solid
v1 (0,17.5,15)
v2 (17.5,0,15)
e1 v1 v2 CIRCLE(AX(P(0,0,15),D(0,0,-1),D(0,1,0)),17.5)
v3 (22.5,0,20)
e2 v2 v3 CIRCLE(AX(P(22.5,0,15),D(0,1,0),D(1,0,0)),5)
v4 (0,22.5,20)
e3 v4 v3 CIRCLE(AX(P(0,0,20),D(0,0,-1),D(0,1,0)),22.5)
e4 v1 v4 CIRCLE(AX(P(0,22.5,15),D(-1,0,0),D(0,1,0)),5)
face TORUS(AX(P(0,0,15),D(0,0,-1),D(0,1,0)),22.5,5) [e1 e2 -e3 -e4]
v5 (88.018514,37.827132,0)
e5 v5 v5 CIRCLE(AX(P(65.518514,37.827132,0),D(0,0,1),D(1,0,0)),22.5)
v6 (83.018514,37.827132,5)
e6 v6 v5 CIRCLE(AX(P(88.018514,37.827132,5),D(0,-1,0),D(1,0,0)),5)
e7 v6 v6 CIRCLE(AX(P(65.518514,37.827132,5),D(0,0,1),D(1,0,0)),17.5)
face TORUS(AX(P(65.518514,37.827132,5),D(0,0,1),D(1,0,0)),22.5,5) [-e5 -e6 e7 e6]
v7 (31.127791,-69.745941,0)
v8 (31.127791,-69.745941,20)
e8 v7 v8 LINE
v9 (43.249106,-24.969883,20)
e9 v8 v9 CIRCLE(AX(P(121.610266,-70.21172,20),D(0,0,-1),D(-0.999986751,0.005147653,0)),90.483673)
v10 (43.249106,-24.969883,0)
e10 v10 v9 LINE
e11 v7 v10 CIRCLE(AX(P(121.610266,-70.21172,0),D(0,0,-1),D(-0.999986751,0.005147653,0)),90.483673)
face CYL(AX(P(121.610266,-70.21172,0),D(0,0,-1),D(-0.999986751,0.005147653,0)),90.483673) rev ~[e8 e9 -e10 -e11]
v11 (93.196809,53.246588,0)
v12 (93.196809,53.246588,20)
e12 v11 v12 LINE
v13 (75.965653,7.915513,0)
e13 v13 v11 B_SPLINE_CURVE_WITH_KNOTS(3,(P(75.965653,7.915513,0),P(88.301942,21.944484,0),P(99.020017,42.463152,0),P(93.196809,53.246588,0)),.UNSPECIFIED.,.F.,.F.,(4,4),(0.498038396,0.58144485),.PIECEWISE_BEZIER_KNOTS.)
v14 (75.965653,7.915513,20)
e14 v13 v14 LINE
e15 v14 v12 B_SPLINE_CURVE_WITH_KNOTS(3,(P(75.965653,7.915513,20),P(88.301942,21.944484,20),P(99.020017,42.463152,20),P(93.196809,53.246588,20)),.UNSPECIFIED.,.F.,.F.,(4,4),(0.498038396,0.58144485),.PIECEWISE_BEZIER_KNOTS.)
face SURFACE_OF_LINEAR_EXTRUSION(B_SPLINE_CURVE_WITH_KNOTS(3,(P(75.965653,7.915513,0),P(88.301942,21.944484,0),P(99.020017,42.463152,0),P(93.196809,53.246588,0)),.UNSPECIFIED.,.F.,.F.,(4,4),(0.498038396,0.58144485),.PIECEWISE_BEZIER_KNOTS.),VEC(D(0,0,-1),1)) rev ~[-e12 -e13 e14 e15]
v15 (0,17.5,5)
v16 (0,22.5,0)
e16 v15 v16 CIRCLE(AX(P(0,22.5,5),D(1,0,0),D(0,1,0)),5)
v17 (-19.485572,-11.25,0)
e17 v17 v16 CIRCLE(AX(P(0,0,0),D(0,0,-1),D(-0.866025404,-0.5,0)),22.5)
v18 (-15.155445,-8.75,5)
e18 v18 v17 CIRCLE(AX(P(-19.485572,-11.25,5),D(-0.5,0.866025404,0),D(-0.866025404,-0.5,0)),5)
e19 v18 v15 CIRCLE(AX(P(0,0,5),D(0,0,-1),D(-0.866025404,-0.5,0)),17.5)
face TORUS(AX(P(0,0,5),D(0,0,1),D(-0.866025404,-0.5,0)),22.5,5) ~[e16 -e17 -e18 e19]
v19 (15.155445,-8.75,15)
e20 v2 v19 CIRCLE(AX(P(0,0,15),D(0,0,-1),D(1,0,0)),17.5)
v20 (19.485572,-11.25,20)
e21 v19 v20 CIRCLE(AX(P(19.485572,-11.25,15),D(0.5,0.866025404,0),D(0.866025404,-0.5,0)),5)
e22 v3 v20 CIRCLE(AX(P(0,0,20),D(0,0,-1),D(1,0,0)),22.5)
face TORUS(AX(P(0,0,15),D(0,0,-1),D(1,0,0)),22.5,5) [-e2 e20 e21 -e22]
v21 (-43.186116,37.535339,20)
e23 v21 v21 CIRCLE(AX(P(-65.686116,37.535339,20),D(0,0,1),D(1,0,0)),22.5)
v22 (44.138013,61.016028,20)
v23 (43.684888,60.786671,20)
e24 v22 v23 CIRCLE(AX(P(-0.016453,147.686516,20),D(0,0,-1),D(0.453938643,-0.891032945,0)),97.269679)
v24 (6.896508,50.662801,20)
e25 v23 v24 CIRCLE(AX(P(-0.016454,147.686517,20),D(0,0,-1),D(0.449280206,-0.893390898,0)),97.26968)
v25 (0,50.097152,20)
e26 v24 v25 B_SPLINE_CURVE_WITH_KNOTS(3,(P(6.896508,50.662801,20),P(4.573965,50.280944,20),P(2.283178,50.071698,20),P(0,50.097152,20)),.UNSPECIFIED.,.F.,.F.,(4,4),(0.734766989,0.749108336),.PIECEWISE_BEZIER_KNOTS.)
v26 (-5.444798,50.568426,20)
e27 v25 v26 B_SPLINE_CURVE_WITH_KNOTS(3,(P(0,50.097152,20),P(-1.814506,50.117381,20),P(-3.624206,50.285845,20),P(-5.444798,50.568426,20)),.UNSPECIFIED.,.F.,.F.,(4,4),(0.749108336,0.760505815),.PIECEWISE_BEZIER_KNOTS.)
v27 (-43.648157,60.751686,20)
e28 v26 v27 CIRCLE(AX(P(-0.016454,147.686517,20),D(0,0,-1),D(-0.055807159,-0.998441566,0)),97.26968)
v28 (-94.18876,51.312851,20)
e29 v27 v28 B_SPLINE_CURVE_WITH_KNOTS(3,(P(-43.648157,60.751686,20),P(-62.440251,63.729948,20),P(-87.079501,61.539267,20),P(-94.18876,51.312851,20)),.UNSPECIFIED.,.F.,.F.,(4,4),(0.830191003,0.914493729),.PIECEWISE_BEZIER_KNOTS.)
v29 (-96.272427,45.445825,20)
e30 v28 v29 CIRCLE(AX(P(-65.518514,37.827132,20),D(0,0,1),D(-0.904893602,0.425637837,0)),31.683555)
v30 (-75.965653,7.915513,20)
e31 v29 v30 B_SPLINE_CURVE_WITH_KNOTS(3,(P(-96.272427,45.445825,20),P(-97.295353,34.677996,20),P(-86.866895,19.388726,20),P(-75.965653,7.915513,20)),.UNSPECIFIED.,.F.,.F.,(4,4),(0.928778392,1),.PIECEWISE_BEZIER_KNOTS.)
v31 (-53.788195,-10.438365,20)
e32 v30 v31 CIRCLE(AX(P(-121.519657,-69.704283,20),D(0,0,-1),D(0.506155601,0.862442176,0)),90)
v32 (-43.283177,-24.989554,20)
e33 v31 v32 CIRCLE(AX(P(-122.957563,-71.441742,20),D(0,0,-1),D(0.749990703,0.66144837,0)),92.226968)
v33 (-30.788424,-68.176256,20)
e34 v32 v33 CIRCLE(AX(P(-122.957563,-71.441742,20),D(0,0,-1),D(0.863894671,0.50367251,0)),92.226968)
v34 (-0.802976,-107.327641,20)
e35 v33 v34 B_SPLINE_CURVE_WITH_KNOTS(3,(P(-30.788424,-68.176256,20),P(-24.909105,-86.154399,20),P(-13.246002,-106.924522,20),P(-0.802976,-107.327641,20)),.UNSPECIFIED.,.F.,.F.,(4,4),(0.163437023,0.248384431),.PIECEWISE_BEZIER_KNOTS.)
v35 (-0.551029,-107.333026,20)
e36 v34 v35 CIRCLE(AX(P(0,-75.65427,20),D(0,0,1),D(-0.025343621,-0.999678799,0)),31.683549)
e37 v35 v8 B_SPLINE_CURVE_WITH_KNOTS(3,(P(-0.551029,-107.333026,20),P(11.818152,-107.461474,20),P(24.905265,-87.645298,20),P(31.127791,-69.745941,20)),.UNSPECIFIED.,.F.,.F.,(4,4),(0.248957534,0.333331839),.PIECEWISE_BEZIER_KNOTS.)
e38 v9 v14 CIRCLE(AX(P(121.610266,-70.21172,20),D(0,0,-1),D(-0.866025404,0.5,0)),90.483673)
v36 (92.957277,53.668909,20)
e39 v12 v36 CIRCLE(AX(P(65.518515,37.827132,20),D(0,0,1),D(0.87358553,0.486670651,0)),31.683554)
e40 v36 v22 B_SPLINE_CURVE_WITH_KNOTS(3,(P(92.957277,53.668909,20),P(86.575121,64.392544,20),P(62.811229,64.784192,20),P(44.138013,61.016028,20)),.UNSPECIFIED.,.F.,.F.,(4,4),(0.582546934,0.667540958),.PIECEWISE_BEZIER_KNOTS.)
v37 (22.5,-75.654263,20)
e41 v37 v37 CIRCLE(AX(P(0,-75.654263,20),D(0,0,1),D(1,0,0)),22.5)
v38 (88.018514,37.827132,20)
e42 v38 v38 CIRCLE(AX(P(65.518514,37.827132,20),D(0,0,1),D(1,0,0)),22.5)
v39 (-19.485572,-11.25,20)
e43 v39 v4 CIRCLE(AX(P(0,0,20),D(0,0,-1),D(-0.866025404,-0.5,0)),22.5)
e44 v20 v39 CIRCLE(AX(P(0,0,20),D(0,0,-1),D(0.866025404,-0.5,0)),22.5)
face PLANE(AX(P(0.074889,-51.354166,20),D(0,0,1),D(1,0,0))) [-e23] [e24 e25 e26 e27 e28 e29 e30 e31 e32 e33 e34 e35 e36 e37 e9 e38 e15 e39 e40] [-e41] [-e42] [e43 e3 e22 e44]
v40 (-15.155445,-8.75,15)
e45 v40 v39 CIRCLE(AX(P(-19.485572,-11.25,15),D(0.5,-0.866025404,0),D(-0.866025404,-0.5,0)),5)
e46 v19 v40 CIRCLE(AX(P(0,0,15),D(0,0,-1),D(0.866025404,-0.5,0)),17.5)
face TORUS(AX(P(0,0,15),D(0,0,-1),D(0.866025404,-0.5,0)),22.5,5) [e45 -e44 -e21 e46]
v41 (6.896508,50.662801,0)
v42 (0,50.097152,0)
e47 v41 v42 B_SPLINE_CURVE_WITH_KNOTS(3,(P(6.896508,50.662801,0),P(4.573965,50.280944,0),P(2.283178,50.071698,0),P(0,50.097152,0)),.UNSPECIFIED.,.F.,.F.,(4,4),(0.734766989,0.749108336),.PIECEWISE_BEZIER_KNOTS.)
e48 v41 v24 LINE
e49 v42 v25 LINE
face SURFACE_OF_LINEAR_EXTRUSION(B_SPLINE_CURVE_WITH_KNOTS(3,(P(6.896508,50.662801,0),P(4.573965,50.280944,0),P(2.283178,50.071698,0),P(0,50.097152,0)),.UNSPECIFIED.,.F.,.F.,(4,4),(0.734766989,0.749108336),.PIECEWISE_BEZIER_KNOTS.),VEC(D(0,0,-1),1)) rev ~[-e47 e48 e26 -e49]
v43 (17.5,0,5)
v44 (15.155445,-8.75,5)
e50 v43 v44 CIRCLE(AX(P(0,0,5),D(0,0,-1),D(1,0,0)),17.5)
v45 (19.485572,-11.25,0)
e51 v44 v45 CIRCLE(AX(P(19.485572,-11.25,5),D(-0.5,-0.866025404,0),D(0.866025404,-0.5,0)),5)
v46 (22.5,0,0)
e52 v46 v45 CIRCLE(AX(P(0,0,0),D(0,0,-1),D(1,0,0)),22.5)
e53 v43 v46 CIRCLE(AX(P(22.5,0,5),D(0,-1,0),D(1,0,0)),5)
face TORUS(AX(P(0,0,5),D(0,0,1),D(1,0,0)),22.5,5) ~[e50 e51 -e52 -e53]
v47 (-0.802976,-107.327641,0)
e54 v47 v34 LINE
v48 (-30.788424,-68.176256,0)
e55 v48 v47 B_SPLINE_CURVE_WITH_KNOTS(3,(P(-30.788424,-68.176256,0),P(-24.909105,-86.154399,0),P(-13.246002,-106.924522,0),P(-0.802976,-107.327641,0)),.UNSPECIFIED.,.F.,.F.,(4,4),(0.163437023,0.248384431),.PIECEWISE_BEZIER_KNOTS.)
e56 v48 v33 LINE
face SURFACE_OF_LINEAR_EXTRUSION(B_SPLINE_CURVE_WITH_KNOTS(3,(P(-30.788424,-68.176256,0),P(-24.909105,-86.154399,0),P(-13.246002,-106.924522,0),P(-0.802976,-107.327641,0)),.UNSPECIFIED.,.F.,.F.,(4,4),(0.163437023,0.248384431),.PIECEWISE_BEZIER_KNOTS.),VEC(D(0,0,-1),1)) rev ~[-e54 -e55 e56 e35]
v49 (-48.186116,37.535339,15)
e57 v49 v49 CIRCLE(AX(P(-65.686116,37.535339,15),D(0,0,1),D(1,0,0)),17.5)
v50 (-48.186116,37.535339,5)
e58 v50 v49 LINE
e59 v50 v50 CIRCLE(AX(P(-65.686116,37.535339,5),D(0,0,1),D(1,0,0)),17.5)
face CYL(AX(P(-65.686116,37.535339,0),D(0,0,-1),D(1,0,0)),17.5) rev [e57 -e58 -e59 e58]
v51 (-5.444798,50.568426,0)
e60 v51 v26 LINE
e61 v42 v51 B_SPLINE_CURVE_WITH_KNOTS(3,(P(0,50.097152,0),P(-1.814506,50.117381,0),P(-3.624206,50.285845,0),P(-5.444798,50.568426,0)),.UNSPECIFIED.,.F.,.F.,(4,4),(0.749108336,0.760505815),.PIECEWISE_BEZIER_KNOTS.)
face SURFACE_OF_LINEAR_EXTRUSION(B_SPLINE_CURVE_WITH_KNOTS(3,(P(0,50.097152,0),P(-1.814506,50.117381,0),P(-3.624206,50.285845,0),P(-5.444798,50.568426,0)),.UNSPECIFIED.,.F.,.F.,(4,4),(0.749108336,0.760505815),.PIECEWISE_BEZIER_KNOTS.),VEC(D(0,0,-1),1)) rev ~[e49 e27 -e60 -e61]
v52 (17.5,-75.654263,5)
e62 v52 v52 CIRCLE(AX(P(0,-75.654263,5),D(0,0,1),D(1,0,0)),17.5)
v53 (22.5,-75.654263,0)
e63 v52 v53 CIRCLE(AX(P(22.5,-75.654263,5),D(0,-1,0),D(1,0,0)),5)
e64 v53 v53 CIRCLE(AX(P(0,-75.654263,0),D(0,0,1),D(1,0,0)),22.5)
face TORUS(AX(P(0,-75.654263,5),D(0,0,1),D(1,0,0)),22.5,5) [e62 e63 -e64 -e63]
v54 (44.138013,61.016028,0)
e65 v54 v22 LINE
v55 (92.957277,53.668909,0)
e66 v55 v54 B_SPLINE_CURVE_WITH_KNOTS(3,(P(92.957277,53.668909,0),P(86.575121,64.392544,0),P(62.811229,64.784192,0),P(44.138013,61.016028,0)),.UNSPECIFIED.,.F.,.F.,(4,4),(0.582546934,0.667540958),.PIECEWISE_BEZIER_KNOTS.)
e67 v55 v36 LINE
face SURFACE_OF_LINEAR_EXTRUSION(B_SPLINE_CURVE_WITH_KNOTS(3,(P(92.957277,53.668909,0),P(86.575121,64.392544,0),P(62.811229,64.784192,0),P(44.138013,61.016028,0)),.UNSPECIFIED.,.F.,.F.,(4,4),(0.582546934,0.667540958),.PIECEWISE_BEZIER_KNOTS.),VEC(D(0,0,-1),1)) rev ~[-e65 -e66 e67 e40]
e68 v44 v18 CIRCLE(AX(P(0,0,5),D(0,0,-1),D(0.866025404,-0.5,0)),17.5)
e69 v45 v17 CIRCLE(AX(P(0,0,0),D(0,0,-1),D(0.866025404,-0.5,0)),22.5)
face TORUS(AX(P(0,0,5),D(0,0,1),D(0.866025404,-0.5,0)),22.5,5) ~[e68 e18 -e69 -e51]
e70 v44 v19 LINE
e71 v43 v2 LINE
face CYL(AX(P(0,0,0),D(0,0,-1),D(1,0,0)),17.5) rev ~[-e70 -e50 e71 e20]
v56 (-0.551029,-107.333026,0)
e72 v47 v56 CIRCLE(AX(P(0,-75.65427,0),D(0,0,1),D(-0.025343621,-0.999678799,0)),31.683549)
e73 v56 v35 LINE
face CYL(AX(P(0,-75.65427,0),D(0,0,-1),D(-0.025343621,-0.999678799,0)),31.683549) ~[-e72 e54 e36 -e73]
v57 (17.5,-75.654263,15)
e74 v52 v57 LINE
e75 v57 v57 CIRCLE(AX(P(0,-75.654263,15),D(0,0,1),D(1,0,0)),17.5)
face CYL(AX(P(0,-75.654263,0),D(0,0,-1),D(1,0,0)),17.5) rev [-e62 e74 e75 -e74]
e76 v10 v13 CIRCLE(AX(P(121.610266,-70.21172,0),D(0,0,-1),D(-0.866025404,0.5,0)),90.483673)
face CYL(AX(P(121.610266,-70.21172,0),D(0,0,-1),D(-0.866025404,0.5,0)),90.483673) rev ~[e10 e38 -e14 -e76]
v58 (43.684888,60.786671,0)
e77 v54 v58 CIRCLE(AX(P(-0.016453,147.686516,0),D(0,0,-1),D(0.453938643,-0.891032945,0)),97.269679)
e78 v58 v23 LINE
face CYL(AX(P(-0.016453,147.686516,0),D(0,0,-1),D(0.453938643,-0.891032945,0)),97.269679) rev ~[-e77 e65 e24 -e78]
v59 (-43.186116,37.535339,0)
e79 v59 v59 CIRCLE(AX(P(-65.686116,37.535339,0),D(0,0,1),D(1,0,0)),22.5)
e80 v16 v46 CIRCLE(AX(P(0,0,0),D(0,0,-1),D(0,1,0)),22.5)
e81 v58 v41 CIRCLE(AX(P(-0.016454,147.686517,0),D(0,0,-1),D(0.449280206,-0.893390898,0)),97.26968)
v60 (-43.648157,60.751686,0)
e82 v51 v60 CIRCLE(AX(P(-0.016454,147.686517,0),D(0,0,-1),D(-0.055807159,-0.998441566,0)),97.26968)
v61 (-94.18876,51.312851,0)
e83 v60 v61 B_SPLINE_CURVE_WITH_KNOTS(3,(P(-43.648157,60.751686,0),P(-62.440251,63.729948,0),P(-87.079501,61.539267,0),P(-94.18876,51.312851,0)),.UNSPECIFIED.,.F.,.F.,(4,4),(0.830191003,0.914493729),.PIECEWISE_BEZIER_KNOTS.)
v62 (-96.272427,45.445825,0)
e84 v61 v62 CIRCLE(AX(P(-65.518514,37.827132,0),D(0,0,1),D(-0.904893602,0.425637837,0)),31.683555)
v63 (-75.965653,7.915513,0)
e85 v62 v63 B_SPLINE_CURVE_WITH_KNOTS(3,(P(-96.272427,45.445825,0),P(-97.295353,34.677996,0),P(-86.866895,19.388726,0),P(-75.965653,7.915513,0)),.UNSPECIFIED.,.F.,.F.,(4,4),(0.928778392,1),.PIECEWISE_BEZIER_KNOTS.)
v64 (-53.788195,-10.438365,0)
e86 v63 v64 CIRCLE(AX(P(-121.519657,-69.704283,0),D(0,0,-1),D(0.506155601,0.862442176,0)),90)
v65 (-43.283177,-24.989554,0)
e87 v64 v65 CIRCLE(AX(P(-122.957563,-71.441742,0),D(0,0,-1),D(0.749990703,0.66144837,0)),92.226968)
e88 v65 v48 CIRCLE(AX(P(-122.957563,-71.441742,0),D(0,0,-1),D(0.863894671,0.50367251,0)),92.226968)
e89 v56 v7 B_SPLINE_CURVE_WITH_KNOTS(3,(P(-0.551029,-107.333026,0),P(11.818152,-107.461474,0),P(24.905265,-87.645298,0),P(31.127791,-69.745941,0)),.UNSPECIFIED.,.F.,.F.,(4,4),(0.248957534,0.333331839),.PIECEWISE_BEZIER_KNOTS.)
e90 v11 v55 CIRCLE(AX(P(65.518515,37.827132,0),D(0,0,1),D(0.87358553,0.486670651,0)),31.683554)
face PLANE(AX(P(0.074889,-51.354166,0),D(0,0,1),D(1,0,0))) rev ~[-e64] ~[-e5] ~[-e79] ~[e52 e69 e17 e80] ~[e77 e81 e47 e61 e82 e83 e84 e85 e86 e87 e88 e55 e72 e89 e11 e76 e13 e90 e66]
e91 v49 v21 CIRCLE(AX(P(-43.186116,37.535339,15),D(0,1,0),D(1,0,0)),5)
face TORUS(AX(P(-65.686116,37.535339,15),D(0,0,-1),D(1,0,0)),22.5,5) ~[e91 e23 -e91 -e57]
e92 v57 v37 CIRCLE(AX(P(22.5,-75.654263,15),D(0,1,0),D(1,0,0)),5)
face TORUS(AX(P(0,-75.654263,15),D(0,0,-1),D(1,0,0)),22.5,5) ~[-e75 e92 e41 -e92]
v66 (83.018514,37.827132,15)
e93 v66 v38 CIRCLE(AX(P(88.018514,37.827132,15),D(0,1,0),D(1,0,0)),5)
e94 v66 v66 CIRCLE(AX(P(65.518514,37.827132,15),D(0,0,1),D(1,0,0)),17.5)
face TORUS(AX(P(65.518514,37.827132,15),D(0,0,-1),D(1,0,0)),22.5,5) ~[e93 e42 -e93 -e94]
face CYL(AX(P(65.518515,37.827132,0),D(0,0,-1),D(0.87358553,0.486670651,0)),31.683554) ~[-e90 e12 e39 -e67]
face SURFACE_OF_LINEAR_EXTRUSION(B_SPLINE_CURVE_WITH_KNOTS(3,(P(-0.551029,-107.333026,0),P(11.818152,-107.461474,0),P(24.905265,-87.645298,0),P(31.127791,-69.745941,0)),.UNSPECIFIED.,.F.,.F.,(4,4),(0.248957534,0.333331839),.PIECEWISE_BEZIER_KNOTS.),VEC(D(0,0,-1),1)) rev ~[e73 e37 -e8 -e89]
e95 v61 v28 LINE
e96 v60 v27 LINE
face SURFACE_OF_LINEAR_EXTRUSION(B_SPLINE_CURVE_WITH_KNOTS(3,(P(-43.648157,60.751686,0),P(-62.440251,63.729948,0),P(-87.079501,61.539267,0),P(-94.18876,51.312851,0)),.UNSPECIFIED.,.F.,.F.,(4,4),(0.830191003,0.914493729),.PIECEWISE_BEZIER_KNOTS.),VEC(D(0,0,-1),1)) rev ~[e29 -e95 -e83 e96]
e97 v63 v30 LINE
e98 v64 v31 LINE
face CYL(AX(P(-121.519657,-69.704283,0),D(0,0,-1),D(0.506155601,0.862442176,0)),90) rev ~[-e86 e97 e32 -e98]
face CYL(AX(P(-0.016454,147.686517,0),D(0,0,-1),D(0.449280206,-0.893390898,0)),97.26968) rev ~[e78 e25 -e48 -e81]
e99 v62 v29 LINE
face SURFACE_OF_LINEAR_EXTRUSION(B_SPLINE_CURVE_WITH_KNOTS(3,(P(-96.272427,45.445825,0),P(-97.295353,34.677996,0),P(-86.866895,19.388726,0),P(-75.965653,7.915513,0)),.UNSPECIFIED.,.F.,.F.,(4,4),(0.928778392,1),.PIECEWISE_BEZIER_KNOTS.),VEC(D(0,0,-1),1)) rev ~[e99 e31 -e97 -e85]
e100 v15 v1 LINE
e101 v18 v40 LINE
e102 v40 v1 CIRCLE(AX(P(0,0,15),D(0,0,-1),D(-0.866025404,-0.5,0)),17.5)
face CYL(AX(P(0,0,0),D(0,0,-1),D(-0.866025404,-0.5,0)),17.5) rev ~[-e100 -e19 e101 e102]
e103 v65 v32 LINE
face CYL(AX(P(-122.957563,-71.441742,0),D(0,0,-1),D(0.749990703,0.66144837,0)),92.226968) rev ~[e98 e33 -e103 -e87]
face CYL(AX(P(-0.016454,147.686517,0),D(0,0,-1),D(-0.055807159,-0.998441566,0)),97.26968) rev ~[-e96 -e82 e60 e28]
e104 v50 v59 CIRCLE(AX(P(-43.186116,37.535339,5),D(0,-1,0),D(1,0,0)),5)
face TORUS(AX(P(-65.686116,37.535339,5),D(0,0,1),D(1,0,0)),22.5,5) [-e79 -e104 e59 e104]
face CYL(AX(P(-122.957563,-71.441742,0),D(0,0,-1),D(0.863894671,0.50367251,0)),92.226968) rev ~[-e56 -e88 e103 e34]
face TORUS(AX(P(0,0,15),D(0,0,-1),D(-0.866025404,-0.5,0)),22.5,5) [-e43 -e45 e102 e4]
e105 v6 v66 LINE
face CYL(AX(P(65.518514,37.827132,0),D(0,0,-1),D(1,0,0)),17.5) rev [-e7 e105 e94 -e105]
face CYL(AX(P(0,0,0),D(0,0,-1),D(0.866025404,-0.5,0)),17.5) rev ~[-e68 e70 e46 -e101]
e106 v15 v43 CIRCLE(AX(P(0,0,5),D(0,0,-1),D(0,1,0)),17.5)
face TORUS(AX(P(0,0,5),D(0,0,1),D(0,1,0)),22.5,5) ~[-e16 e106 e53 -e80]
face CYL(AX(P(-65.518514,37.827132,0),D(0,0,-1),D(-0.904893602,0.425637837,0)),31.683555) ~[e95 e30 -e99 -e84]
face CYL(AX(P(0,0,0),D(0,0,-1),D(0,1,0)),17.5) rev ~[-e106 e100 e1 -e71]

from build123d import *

# Parameters (mm, degrees)
F0_R     = 17.5
F1_DEPTH = 20
F2_R     = 5


# Not quite as in the source:
# - a feature names something its author has since deleted; it is built from what else it names


with BuildPart() as f1:
    # F0 (on Top) → F1 (new body)
    with BuildSketch(Plane.XY):
        with BuildLine():
            ThreePointArc((-0.8029759794, -107.3276413225), (-0.6770077139, -107.3305842091), (-0.551028741, -107.3330261089))
            add(Edge.make_bspline(
                [(-0.551028741, -107.3330261089), (11.8181523091, -107.461473966), (24.9052651001, -87.6452975434), (31.1277913127, -69.7459411731)],
                knots=[0.2489575342, 0.2489575342, 0.2489575342, 0.2489575342, 0.333331839, 0.333331839, 0.333331839, 0.333331839], degree=3))
            ThreePointArc((31.1277913127, -69.7459411731), (34.2703147589, -46.5679448448), (43.2491060822, -24.9698830388))
            Line((43.2491060822, -24.9698830388), (15.1554445662, -8.75))
            ThreePointArc((15.1554445662, -8.75), (0, -17.5), (-15.1554445662, -8.75))
            Line((-15.1554445662, -8.75), (-43.2831772417, -24.9895540319))
            ThreePointArc((-43.2831772417, -24.9895540319), (-34.3639851715, -45.8098967668), (-30.7884242712, -68.1762559483))
            add(Edge.make_bspline(
                [(-30.7884242712, -68.1762559483), (-24.9091046437, -86.1543987507), (-13.2460019559, -106.9245217626), (-0.8029759794, -107.3276413225)],
                knots=[0.1634370226, 0.1634370226, 0.1634370226, 0.1634370226, 0.2483844308, 0.2483844308, 0.2483844308, 0.2483844308], degree=3))
        make_face()
        with Locations((0, -75.6542630794)):
            Circle(F0_R, mode=Mode.SUBTRACT)
        with BuildLine():
            Line((15.1554445662, -8.75), (43.2491060822, -24.9698830388))
            ThreePointArc((43.2491060822, -24.9698830388), (57.4641806171, -6.3949907545), (75.9656525231, 7.9155125461))
            add(Edge.make_bspline(
                [(75.9656525231, 7.9155125461), (88.3019417057, 21.9444843566), (99.0200166091, 42.4631515807), (93.1968089359, 53.246587896)],
                knots=[0.4980383956, 0.4980383956, 0.4980383956, 0.4980383956, 0.5814448504, 0.5814448504, 0.5814448504, 0.5814448504], degree=3))
            ThreePointArc((93.1968089359, 53.246587896), (93.0778520452, 53.4582073651), (92.9572772103, 53.6689091704))
            add(Edge.make_bspline(
                [(92.9572772309, 53.6689091323), (86.5751209743, 64.3925439745), (62.811229058, 64.7841921161), (44.1380127183, 61.0160283089)],
                knots=[0.5825469337, 0.5825469337, 0.5825469337, 0.5825469337, 0.6675409578, 0.6675409578, 0.6675409578, 0.6675409578], degree=3))
            ThreePointArc((44.1380127381, 61.0160283086), (43.9116000862, 60.901053892), (43.6848880533, 60.7866709406))
            ThreePointArc((43.6848880533, 60.7866709406), (25.7919775423, 53.9031742146), (6.8965083627, 50.6628010548))
            add(Edge.make_bspline(
                [(6.8965083627, 50.6628010548), (4.5739652958, 50.280943855), (2.2831775194, 50.0716978343), (0, 50.097151764)],
                knots=[0.7347669892, 0.7347669892, 0.7347669892, 0.7347669892, 0.7491083365, 0.7491083365, 0.7491083365, 0.7491083365], degree=3))
            Line((0, 50.097151764), (0, 17.5))
            ThreePointArc((0, 17.5), (12.3743686708, 12.3743686708), (17.5, 0))
            ThreePointArc((17.5, 0), (16.9037019601, -4.5293332893), (15.1554445662, -8.75))
        make_face()
        with Locations((65.5185137313, 37.8271315397)):
            Circle(F0_R, mode=Mode.SUBTRACT)
        with BuildLine():
            add(Edge.make_bspline(
                [(-43.6481574505, 60.7516855355), (-62.440250746, 63.7299483995), (-87.0795012181, 61.5392674073), (-94.1887599838, 51.3128513788)],
                knots=[0.8301910028, 0.8301910028, 0.8301910028, 0.8301910028, 0.9144937287, 0.9144937287, 0.9144937287, 0.9144937287], degree=3))
            ThreePointArc((-94.1887599838, 51.3128513788), (-95.3750569752, 48.4306444144), (-96.272426733, 45.4458253151))
            add(Edge.make_bspline(
                [(-96.272426733, 45.4458253151), (-97.2953532658, 34.6779957553), (-86.8668945977, 19.3887259528), (-75.9656525231, 7.9155125461)],
                knots=[0.928778392, 0.928778392, 0.928778392, 0.928778392, 1, 1, 1, 1], degree=3))
            ThreePointArc((-75.9656525231, 7.9155125461), (-64.1383408586, -0.3689777355), (-53.7881948507, -10.4383649091))
            ThreePointArc((-53.7881948507, -10.4383649091), (-48.1808952117, -17.4578234301), (-43.2831772417, -24.9895540319))
            Line((-43.2831772417, -24.9895540319), (-15.1554445662, -8.75))
            ThreePointArc((-15.1554445662, -8.75), (-15.1554445662, 8.75), (0, 17.5))
            Line((0, 17.5), (0, 50.097151764))
            add(Edge.make_bspline(
                [(0, 50.097151764), (-1.8145063432, 50.1173807285), (-3.6242060978, 50.2858446459), (-5.4447980162, 50.5684261256)],
                knots=[0.7491083365, 0.7491083365, 0.7491083365, 0.7491083365, 0.7605058146, 0.7605058146, 0.7605058146, 0.7605058146], degree=3))
            ThreePointArc((-5.4447980162, 50.5684261256), (-25.0693332151, 53.6985192443), (-43.6481574505, 60.7516855355))
        make_face()
        with Locations((-65.6861164256, 37.535338503)):
            Circle(F0_R, mode=Mode.SUBTRACT)
    extrude(amount=F1_DEPTH)

    # F2
    f2_edges = [f1.edges().sort_by_distance(p)[0] for p in [
        (-48.186116, 37.535339, 10),
        (-83.186116, 37.535339, 0),
        (-83.186116, 37.535339, 20),
        (-15.155445, -8.75, 10),
        (15.155445, 8.75, 0),
        (15.155445, 8.75, 20),
        (83.018514, 37.827132, 10),
        (48.018514, 37.827132, 0),
        (48.018514, 37.827132, 20),
        (17.5, -75.654263, 10),
        (-17.5, -75.654263, 0),
        (-17.5, -75.654263, 20),
    ]]
    fillet(f2_edges, radius=F2_R)


solid = f1.part
